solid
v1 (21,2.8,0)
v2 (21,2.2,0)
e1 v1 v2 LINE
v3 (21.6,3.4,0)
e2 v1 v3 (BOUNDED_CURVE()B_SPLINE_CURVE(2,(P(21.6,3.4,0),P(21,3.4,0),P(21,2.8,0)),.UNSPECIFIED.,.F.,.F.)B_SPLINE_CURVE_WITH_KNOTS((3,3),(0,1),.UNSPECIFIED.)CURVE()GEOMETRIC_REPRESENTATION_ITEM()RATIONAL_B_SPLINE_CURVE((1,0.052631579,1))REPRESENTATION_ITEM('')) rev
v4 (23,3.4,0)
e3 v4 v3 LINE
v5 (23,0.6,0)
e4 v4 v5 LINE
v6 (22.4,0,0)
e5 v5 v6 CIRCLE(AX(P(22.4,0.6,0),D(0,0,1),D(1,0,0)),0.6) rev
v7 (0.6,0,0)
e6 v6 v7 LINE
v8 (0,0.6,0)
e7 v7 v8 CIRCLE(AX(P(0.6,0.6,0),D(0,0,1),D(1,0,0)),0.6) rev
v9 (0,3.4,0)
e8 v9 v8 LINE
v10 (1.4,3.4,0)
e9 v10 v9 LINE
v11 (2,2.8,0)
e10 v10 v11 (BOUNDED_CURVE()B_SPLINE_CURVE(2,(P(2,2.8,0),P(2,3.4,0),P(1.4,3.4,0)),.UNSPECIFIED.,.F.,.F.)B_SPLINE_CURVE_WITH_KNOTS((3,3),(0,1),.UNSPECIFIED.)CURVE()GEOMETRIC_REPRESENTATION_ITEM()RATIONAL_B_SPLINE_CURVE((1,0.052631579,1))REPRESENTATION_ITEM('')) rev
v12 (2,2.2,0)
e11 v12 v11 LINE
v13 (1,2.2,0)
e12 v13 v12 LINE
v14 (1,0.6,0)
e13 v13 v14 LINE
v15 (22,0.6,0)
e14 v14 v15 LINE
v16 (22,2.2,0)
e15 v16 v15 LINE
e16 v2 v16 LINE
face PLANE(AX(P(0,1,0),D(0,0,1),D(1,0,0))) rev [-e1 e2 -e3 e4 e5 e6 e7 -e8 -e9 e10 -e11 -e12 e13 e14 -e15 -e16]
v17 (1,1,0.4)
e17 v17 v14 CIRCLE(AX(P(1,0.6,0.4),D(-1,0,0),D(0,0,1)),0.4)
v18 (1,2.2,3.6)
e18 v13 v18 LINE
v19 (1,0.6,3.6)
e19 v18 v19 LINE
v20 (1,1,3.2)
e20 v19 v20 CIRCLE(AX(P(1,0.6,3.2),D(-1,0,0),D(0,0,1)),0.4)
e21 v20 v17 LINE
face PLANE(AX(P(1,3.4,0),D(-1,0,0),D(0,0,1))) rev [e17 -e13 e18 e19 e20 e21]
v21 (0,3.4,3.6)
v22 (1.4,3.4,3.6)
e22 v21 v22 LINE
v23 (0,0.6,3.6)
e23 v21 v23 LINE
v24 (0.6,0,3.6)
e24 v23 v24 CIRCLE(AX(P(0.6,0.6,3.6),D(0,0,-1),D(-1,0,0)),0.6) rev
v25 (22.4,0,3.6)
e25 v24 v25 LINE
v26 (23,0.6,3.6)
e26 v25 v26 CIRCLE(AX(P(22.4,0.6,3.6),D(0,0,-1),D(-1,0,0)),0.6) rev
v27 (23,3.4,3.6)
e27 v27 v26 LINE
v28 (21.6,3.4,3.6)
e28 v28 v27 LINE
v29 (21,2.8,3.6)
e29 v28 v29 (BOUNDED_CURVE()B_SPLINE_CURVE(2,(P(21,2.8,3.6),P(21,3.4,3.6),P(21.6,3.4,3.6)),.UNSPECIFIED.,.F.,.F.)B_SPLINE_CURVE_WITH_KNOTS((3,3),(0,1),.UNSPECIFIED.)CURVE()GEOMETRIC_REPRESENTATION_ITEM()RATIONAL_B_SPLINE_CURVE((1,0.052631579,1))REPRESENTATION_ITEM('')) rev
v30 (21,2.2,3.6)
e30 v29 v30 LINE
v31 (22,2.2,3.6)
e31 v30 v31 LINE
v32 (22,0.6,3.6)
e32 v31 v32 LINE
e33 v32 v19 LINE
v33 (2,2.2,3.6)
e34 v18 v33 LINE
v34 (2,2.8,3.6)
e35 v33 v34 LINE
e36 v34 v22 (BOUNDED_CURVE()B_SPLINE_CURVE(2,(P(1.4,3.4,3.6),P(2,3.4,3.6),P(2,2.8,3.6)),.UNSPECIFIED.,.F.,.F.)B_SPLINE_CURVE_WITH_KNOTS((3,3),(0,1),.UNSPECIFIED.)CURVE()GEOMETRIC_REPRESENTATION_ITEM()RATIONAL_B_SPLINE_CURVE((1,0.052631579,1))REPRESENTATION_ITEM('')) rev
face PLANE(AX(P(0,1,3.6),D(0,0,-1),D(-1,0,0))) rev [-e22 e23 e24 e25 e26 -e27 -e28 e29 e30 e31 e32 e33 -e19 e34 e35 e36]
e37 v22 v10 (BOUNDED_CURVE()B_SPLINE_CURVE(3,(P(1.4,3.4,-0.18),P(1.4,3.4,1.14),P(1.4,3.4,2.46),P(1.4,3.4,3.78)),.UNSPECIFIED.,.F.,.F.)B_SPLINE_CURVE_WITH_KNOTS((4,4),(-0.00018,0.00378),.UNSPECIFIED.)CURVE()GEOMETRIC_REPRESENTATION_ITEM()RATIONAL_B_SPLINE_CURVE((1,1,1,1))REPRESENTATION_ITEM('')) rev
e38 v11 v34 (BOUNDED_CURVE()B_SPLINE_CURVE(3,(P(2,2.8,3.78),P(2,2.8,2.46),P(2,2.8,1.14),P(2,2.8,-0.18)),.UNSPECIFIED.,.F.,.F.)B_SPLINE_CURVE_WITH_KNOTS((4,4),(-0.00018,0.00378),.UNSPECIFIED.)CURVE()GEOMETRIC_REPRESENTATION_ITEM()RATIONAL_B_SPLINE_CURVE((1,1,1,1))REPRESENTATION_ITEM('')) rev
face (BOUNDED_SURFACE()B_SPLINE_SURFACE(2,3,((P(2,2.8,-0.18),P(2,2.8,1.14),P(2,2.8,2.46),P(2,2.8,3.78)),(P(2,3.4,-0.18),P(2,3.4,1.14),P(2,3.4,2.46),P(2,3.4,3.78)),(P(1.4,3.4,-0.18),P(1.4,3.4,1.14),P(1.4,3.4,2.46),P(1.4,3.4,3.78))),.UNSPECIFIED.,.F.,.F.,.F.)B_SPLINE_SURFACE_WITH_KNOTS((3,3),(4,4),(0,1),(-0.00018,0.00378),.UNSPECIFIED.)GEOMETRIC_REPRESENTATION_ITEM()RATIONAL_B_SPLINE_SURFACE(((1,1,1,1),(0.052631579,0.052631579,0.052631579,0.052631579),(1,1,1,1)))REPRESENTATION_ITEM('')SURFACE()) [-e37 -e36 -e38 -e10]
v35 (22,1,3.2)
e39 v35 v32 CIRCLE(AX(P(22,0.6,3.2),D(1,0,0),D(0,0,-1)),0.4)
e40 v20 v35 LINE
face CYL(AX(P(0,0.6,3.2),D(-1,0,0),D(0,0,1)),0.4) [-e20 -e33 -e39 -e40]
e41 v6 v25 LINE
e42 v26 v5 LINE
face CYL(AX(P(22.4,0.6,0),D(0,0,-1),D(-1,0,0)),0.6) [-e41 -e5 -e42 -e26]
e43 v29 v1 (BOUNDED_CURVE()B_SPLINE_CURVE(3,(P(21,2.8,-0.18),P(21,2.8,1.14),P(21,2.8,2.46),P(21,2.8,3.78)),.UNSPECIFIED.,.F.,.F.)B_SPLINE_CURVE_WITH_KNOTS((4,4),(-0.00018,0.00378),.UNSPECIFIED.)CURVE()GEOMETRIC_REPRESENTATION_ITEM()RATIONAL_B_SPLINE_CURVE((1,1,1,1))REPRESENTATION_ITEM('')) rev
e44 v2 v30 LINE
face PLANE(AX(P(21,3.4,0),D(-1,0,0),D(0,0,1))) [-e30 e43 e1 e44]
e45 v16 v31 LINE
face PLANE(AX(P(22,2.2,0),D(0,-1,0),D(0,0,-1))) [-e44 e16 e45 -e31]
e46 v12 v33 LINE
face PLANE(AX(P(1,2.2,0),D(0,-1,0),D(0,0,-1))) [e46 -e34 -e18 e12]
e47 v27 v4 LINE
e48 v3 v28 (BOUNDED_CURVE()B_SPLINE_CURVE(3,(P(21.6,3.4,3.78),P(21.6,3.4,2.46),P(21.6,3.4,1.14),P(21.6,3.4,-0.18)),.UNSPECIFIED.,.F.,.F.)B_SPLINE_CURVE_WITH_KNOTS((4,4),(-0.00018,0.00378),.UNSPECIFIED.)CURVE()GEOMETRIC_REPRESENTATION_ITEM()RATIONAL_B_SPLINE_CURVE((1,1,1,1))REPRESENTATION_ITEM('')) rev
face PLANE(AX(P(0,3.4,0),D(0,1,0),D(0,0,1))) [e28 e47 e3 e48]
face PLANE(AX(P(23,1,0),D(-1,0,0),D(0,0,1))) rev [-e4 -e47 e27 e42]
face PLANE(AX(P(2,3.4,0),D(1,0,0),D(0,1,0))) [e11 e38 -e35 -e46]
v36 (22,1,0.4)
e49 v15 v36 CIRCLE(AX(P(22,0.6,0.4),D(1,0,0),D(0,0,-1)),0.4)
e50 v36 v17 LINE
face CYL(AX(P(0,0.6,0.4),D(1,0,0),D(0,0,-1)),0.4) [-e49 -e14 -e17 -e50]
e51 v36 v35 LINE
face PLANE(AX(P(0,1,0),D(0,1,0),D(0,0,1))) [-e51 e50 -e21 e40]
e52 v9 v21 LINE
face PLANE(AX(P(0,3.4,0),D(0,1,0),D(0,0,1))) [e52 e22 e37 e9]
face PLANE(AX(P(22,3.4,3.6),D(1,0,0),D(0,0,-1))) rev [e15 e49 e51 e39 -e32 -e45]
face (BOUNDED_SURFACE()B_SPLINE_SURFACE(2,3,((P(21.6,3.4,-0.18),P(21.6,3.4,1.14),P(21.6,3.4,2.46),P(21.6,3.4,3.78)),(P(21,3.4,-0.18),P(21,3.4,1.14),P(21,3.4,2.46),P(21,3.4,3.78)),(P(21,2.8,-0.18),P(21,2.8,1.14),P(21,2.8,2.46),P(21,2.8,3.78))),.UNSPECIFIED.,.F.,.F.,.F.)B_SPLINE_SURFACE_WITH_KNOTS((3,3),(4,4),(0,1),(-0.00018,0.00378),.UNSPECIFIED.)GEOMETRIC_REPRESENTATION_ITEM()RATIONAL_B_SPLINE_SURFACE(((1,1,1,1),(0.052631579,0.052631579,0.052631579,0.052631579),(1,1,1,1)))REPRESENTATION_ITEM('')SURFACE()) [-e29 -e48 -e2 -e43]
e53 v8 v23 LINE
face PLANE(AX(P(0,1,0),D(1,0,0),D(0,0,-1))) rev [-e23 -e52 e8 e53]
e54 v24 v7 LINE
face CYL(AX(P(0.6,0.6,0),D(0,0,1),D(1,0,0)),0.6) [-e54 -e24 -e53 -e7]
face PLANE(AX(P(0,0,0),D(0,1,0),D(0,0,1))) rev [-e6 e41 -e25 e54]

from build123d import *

# Parameters (mm, degrees)
SKETCH1_W           = 23
SKETCH1_H           = 3.6
BOSS_EXTRUDE1_DEPTH = 1
SKETCH2_W           = 1
SKETCH2_H           = 3.6
BOSS_EXTRUDE2_DEPTH = 2.4
SKETCH3_W           = 1
SKETCH3_H           = 1.2
BOSS_EXTRUDE3_DEPTH = 3.6
FILLET1_SIZE        = 0.6
FILLET2_R           = 0.6
FILLET3_R           = 0.4


with BuildPart() as part:
    # Sketch1 → Boss-Extrude1 (new body)
    with BuildSketch(Plane(origin=(0, 0, 0), x_dir=(1, 0, 0), z_dir=(0, 1, 0))):
        with Locations((11.5, -1.8)):
            Rectangle(SKETCH1_W, SKETCH1_H)
    extrude(amount=BOSS_EXTRUDE1_DEPTH)

    # Sketch2 → Boss-Extrude2 (add)
    with BuildSketch(Plane(origin=(0, 1, 0), x_dir=(1, 0, 0), z_dir=(0, 1, 0))):
        with Locations((0.5, -1.8)):
            Rectangle(SKETCH2_W, SKETCH2_H)
        with Locations((22.5, -1.8)):
            Rectangle(SKETCH2_W, SKETCH2_H)
    extrude(amount=BOSS_EXTRUDE2_DEPTH)

    # Sketch3 → Boss-Extrude3 (add)
    with BuildSketch(Plane.XY.offset(3.6)):
        with Locations((1.5, 2.8)):
            Rectangle(SKETCH3_W, SKETCH3_H)
        with Locations((21.5, 2.8)):
            Rectangle(SKETCH3_W, SKETCH3_H)
    extrude(amount=-BOSS_EXTRUDE3_DEPTH)

    # Fillet1
    # a fillet whose section is not a circle: 0.6 mm, written as the material it takes off along each edge
    with BuildSketch(Plane(origin=(21, 3.4, 5.1), x_dir=(1, 0, 0), z_dir=(0, 0, -1)), Plane(origin=(2, 3.4, 5.1), x_dir=(0, -1, 0), z_dir=(0, 0, -1))) as fillet1_piece_1:
        with BuildLine():
            Bezier((FILLET1_SIZE, 0), (0, 0), (0, FILLET1_SIZE), weights=[1, 0.052631579, 1])
            Line((0, FILLET1_SIZE), (0, 0))
            Line((0, 0), (FILLET1_SIZE, 0))
        make_face()
    extrude(amount=6.6, mode=Mode.SUBTRACT)

    # Fillet2
    fillet2_edges = [part.edges().sort_by_distance(p)[0] for p in [
        (23, 0, 1.8),
        (0, 0, 1.8),
    ]]
    fillet(fillet2_edges, radius=FILLET2_R)

    # Fillet3
    fillet3_edges = [part.edges().sort_by_distance(p)[0] for p in [
        (11.5, 1, 3.6),
        (11.5, 1, 0),
    ]]
    fillet(fillet3_edges, radius=FILLET3_R)


solid = part.part
